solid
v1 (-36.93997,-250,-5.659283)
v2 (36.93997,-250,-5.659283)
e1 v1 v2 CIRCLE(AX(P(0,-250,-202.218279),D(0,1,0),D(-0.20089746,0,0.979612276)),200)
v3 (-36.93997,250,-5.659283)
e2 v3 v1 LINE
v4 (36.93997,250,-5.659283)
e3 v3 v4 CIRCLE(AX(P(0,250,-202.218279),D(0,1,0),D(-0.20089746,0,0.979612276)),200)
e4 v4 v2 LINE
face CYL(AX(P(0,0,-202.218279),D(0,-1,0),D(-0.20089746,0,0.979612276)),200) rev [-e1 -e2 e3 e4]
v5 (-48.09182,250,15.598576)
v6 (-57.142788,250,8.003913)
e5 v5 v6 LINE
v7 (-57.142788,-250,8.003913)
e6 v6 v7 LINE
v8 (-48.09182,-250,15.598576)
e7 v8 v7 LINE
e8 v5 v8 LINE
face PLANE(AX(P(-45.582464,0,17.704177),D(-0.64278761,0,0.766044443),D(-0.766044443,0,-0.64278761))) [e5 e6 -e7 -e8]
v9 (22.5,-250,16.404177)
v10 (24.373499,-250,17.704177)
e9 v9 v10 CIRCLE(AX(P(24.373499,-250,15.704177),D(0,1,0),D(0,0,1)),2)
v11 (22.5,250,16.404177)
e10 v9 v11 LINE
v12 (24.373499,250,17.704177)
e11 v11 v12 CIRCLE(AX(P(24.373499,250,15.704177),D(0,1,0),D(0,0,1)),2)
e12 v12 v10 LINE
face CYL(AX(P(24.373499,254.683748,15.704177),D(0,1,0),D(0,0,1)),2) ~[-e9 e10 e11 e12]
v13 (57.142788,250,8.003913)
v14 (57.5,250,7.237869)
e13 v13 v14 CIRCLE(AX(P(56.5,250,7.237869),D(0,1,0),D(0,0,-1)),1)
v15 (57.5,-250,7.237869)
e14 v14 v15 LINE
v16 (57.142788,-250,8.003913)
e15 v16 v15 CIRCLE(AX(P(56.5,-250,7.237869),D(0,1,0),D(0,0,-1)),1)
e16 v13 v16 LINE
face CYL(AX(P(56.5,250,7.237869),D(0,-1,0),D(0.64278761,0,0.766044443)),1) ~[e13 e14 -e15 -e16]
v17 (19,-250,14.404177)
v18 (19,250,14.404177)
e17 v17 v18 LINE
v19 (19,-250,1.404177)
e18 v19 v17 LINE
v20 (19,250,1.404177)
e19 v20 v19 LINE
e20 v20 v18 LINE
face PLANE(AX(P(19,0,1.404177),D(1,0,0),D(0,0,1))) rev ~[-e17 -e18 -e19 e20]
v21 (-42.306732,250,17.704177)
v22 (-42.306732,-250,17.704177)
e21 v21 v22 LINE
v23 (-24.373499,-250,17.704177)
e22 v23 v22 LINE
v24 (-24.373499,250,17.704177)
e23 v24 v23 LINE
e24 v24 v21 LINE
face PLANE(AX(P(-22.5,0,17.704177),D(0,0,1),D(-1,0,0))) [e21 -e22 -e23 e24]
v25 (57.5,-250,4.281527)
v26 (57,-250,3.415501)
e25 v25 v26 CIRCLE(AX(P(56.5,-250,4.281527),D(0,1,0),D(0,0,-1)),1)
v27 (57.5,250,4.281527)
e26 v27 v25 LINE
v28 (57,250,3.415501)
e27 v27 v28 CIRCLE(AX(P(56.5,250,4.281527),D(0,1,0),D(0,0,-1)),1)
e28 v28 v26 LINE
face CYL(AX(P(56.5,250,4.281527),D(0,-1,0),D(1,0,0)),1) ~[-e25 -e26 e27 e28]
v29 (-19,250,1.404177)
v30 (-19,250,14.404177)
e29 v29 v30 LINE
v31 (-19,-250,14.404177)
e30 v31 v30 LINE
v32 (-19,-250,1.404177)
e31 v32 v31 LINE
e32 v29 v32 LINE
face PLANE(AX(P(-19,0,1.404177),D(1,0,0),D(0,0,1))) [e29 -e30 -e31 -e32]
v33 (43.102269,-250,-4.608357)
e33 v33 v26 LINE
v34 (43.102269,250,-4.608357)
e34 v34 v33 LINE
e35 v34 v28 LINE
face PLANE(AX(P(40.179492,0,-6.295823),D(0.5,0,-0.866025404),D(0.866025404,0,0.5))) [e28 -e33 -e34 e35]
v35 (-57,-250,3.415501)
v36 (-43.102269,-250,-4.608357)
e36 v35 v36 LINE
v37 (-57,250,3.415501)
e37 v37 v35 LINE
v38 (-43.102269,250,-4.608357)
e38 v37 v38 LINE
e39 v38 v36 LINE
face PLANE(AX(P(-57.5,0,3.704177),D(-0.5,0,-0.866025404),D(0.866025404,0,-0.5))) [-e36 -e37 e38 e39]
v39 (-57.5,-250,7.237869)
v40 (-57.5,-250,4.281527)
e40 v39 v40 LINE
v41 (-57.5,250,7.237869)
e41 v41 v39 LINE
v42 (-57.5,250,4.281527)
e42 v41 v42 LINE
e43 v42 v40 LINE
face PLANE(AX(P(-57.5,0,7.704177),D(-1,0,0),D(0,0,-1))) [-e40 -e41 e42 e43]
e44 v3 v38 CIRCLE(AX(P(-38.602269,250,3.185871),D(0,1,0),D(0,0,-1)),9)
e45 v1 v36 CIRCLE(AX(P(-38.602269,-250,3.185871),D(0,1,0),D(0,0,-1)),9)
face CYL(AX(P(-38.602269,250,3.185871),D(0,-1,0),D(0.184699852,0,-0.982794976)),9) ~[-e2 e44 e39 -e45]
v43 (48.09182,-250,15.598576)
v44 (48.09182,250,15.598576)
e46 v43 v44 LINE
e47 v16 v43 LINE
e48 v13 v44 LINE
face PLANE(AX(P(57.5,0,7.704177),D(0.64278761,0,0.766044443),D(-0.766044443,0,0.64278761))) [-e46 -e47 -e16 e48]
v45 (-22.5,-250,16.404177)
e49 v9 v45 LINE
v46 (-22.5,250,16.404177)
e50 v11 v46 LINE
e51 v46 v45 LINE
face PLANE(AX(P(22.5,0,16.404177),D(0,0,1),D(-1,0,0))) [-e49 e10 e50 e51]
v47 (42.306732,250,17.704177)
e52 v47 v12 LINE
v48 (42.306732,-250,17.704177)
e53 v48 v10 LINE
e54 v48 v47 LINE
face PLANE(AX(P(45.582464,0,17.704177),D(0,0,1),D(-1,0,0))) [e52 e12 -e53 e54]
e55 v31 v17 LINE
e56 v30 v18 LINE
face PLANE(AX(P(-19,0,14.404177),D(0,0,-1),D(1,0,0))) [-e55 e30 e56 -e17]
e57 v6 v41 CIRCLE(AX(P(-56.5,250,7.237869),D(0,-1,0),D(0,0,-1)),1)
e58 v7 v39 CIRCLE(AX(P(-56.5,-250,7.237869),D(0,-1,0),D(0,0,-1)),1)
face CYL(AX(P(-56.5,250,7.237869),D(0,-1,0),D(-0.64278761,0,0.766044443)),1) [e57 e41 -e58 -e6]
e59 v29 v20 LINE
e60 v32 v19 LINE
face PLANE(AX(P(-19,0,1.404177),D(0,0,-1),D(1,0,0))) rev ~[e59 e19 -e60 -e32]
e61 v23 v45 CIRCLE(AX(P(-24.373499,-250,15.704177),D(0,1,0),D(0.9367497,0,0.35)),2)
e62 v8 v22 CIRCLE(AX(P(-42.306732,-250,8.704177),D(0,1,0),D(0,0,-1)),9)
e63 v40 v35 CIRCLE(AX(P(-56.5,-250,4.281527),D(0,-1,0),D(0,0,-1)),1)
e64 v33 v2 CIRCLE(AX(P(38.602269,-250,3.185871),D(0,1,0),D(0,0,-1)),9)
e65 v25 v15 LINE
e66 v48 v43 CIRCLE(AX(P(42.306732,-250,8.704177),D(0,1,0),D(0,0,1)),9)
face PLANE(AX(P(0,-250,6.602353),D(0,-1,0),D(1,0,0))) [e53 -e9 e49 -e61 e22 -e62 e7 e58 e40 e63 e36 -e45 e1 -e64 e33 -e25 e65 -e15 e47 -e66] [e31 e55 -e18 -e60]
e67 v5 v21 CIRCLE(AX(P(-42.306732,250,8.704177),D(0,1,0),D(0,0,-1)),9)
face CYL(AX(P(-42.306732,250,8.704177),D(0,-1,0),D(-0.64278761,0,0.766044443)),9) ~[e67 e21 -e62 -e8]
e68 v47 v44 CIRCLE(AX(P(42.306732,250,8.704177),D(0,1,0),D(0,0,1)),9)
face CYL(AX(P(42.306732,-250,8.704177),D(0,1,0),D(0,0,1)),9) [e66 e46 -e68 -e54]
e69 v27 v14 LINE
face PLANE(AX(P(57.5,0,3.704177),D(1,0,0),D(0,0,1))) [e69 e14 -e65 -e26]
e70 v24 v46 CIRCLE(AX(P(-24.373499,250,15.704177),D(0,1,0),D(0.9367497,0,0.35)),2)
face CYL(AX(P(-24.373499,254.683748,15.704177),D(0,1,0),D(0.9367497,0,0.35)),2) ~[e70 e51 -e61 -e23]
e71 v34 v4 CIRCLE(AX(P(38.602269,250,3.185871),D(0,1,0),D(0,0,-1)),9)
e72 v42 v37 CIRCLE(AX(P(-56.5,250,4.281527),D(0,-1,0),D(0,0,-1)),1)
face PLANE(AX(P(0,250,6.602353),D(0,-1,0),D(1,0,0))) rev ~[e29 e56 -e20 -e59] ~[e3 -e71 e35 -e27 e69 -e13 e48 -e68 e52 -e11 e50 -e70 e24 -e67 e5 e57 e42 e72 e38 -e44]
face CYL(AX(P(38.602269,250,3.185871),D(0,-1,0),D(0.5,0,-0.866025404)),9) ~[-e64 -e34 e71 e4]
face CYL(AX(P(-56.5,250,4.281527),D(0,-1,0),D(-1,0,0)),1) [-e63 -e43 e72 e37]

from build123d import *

# Parameters (mm, degrees)
F1_DEPTH    = 250
F2_W        = 38
F2_H        = 13
F3_DEPTH    = 250
F4_T1_DEPTH = 509.3674969976
F5_R        = 9
F6_R        = 1


# Not quite as in the source:
# - a fillet or chamfer that OpenCascade refuses, or shapes differently, is made with other operations: its cross-section is extruded or revolved along the edge and cut away or added


with BuildPart() as f1:
    # F0 (on Front) → F1 (new body, symmetric)
    with BuildSketch(Plane.XZ):
        with BuildLine():
            Line((22.5, 16.4041765079), (0, 16.4041765079))
            Line((0, 16.4041765079), (-22.5, 16.4041765079))
            Line((-22.5, 16.4041765079), (-22.5, 17.7041765079))
            Line((-22.5, 17.7041765079), (-45.5824640741, 17.7041765079))
            Line((-45.5824640741, 17.7041765079), (-57.5, 7.7041765079))
            Line((-57.5, 7.7041765079), (-57.5, 3.7041765079))
            Line((-57.5, 3.7041765079), (-40.1794919243, -6.2958234921))
            ThreePointArc((-40.1794919243, -6.2958234921), (0, -2.2182786337), (40.1794919243, -6.2958234921))
            Line((40.1794919243, -6.2958234921), (57.5, 3.7041765079))
            Line((57.5, 3.7041765079), (57.5, 7.7041765079))
            Line((57.5, 7.7041765079), (45.5824640741, 17.7041765079))
            Line((45.5824640741, 17.7041765079), (22.5, 17.7041765079))
            Line((22.5, 17.7041765079), (22.5, 16.4041765079))
        make_face()
    extrude(amount=F1_DEPTH, both=True)

    # F2 (on Front) → F3 (cut, symmetric)
    with BuildSketch(Plane.XZ):
        with Locations((0, 7.9041765079)):
            Rectangle(F2_W, F2_H)
    extrude(amount=F3_DEPTH, both=True, mode=Mode.SUBTRACT)

    # F4: fillet of radius 2 on 2 edges, made by hand

    # F4_s2 → F4_t1 (cut)
    with BuildSketch(Plane.XZ.offset(-254.6837484988)):
        with BuildLine():
            ThreePointArc((-22.5, 16.4041765079), (-23.2333239744, 17.3473441804), (-24.3734993995, 17.7041765079))
            Line((-24.3734993995, 17.7041765079), (-22.5, 17.7041765079))
            Line((-22.5, 17.7041765079), (-22.5, 16.4041765079))
        make_face()
        with BuildLine():
            ThreePointArc((24.3734993995, 17.7041765079), (23.2333239744, 17.3473441804), (22.5, 16.4041765079))
            Line((22.5, 16.4041765079), (22.5, 17.7041765079))
            Line((22.5, 17.7041765079), (24.3734993995, 17.7041765079))
        make_face()
    extrude(amount=F4_T1_DEPTH, mode=Mode.SUBTRACT)

    # F5
    f5_edges = [f1.edges().sort_by_distance(p)[0] for p in [
        (45.582464, 0, 17.704177),
        (40.179492, 0, -6.295823),
        (-40.179492, 0, -6.295823),
        (-45.582464, 0, 17.704177),
    ]]
    fillet(f5_edges, radius=F5_R)

    # F6
    f6_edges = [f1.edges().sort_by_distance(p)[0] for p in [
        (57.5, 0, 3.704177),
        (57.5, 0, 7.704177),
        (-57.5, 0, 7.704177),
        (-57.5, 0, 3.704177),
    ]]
    fillet(f6_edges, radius=F6_R)


solid = f1.part
